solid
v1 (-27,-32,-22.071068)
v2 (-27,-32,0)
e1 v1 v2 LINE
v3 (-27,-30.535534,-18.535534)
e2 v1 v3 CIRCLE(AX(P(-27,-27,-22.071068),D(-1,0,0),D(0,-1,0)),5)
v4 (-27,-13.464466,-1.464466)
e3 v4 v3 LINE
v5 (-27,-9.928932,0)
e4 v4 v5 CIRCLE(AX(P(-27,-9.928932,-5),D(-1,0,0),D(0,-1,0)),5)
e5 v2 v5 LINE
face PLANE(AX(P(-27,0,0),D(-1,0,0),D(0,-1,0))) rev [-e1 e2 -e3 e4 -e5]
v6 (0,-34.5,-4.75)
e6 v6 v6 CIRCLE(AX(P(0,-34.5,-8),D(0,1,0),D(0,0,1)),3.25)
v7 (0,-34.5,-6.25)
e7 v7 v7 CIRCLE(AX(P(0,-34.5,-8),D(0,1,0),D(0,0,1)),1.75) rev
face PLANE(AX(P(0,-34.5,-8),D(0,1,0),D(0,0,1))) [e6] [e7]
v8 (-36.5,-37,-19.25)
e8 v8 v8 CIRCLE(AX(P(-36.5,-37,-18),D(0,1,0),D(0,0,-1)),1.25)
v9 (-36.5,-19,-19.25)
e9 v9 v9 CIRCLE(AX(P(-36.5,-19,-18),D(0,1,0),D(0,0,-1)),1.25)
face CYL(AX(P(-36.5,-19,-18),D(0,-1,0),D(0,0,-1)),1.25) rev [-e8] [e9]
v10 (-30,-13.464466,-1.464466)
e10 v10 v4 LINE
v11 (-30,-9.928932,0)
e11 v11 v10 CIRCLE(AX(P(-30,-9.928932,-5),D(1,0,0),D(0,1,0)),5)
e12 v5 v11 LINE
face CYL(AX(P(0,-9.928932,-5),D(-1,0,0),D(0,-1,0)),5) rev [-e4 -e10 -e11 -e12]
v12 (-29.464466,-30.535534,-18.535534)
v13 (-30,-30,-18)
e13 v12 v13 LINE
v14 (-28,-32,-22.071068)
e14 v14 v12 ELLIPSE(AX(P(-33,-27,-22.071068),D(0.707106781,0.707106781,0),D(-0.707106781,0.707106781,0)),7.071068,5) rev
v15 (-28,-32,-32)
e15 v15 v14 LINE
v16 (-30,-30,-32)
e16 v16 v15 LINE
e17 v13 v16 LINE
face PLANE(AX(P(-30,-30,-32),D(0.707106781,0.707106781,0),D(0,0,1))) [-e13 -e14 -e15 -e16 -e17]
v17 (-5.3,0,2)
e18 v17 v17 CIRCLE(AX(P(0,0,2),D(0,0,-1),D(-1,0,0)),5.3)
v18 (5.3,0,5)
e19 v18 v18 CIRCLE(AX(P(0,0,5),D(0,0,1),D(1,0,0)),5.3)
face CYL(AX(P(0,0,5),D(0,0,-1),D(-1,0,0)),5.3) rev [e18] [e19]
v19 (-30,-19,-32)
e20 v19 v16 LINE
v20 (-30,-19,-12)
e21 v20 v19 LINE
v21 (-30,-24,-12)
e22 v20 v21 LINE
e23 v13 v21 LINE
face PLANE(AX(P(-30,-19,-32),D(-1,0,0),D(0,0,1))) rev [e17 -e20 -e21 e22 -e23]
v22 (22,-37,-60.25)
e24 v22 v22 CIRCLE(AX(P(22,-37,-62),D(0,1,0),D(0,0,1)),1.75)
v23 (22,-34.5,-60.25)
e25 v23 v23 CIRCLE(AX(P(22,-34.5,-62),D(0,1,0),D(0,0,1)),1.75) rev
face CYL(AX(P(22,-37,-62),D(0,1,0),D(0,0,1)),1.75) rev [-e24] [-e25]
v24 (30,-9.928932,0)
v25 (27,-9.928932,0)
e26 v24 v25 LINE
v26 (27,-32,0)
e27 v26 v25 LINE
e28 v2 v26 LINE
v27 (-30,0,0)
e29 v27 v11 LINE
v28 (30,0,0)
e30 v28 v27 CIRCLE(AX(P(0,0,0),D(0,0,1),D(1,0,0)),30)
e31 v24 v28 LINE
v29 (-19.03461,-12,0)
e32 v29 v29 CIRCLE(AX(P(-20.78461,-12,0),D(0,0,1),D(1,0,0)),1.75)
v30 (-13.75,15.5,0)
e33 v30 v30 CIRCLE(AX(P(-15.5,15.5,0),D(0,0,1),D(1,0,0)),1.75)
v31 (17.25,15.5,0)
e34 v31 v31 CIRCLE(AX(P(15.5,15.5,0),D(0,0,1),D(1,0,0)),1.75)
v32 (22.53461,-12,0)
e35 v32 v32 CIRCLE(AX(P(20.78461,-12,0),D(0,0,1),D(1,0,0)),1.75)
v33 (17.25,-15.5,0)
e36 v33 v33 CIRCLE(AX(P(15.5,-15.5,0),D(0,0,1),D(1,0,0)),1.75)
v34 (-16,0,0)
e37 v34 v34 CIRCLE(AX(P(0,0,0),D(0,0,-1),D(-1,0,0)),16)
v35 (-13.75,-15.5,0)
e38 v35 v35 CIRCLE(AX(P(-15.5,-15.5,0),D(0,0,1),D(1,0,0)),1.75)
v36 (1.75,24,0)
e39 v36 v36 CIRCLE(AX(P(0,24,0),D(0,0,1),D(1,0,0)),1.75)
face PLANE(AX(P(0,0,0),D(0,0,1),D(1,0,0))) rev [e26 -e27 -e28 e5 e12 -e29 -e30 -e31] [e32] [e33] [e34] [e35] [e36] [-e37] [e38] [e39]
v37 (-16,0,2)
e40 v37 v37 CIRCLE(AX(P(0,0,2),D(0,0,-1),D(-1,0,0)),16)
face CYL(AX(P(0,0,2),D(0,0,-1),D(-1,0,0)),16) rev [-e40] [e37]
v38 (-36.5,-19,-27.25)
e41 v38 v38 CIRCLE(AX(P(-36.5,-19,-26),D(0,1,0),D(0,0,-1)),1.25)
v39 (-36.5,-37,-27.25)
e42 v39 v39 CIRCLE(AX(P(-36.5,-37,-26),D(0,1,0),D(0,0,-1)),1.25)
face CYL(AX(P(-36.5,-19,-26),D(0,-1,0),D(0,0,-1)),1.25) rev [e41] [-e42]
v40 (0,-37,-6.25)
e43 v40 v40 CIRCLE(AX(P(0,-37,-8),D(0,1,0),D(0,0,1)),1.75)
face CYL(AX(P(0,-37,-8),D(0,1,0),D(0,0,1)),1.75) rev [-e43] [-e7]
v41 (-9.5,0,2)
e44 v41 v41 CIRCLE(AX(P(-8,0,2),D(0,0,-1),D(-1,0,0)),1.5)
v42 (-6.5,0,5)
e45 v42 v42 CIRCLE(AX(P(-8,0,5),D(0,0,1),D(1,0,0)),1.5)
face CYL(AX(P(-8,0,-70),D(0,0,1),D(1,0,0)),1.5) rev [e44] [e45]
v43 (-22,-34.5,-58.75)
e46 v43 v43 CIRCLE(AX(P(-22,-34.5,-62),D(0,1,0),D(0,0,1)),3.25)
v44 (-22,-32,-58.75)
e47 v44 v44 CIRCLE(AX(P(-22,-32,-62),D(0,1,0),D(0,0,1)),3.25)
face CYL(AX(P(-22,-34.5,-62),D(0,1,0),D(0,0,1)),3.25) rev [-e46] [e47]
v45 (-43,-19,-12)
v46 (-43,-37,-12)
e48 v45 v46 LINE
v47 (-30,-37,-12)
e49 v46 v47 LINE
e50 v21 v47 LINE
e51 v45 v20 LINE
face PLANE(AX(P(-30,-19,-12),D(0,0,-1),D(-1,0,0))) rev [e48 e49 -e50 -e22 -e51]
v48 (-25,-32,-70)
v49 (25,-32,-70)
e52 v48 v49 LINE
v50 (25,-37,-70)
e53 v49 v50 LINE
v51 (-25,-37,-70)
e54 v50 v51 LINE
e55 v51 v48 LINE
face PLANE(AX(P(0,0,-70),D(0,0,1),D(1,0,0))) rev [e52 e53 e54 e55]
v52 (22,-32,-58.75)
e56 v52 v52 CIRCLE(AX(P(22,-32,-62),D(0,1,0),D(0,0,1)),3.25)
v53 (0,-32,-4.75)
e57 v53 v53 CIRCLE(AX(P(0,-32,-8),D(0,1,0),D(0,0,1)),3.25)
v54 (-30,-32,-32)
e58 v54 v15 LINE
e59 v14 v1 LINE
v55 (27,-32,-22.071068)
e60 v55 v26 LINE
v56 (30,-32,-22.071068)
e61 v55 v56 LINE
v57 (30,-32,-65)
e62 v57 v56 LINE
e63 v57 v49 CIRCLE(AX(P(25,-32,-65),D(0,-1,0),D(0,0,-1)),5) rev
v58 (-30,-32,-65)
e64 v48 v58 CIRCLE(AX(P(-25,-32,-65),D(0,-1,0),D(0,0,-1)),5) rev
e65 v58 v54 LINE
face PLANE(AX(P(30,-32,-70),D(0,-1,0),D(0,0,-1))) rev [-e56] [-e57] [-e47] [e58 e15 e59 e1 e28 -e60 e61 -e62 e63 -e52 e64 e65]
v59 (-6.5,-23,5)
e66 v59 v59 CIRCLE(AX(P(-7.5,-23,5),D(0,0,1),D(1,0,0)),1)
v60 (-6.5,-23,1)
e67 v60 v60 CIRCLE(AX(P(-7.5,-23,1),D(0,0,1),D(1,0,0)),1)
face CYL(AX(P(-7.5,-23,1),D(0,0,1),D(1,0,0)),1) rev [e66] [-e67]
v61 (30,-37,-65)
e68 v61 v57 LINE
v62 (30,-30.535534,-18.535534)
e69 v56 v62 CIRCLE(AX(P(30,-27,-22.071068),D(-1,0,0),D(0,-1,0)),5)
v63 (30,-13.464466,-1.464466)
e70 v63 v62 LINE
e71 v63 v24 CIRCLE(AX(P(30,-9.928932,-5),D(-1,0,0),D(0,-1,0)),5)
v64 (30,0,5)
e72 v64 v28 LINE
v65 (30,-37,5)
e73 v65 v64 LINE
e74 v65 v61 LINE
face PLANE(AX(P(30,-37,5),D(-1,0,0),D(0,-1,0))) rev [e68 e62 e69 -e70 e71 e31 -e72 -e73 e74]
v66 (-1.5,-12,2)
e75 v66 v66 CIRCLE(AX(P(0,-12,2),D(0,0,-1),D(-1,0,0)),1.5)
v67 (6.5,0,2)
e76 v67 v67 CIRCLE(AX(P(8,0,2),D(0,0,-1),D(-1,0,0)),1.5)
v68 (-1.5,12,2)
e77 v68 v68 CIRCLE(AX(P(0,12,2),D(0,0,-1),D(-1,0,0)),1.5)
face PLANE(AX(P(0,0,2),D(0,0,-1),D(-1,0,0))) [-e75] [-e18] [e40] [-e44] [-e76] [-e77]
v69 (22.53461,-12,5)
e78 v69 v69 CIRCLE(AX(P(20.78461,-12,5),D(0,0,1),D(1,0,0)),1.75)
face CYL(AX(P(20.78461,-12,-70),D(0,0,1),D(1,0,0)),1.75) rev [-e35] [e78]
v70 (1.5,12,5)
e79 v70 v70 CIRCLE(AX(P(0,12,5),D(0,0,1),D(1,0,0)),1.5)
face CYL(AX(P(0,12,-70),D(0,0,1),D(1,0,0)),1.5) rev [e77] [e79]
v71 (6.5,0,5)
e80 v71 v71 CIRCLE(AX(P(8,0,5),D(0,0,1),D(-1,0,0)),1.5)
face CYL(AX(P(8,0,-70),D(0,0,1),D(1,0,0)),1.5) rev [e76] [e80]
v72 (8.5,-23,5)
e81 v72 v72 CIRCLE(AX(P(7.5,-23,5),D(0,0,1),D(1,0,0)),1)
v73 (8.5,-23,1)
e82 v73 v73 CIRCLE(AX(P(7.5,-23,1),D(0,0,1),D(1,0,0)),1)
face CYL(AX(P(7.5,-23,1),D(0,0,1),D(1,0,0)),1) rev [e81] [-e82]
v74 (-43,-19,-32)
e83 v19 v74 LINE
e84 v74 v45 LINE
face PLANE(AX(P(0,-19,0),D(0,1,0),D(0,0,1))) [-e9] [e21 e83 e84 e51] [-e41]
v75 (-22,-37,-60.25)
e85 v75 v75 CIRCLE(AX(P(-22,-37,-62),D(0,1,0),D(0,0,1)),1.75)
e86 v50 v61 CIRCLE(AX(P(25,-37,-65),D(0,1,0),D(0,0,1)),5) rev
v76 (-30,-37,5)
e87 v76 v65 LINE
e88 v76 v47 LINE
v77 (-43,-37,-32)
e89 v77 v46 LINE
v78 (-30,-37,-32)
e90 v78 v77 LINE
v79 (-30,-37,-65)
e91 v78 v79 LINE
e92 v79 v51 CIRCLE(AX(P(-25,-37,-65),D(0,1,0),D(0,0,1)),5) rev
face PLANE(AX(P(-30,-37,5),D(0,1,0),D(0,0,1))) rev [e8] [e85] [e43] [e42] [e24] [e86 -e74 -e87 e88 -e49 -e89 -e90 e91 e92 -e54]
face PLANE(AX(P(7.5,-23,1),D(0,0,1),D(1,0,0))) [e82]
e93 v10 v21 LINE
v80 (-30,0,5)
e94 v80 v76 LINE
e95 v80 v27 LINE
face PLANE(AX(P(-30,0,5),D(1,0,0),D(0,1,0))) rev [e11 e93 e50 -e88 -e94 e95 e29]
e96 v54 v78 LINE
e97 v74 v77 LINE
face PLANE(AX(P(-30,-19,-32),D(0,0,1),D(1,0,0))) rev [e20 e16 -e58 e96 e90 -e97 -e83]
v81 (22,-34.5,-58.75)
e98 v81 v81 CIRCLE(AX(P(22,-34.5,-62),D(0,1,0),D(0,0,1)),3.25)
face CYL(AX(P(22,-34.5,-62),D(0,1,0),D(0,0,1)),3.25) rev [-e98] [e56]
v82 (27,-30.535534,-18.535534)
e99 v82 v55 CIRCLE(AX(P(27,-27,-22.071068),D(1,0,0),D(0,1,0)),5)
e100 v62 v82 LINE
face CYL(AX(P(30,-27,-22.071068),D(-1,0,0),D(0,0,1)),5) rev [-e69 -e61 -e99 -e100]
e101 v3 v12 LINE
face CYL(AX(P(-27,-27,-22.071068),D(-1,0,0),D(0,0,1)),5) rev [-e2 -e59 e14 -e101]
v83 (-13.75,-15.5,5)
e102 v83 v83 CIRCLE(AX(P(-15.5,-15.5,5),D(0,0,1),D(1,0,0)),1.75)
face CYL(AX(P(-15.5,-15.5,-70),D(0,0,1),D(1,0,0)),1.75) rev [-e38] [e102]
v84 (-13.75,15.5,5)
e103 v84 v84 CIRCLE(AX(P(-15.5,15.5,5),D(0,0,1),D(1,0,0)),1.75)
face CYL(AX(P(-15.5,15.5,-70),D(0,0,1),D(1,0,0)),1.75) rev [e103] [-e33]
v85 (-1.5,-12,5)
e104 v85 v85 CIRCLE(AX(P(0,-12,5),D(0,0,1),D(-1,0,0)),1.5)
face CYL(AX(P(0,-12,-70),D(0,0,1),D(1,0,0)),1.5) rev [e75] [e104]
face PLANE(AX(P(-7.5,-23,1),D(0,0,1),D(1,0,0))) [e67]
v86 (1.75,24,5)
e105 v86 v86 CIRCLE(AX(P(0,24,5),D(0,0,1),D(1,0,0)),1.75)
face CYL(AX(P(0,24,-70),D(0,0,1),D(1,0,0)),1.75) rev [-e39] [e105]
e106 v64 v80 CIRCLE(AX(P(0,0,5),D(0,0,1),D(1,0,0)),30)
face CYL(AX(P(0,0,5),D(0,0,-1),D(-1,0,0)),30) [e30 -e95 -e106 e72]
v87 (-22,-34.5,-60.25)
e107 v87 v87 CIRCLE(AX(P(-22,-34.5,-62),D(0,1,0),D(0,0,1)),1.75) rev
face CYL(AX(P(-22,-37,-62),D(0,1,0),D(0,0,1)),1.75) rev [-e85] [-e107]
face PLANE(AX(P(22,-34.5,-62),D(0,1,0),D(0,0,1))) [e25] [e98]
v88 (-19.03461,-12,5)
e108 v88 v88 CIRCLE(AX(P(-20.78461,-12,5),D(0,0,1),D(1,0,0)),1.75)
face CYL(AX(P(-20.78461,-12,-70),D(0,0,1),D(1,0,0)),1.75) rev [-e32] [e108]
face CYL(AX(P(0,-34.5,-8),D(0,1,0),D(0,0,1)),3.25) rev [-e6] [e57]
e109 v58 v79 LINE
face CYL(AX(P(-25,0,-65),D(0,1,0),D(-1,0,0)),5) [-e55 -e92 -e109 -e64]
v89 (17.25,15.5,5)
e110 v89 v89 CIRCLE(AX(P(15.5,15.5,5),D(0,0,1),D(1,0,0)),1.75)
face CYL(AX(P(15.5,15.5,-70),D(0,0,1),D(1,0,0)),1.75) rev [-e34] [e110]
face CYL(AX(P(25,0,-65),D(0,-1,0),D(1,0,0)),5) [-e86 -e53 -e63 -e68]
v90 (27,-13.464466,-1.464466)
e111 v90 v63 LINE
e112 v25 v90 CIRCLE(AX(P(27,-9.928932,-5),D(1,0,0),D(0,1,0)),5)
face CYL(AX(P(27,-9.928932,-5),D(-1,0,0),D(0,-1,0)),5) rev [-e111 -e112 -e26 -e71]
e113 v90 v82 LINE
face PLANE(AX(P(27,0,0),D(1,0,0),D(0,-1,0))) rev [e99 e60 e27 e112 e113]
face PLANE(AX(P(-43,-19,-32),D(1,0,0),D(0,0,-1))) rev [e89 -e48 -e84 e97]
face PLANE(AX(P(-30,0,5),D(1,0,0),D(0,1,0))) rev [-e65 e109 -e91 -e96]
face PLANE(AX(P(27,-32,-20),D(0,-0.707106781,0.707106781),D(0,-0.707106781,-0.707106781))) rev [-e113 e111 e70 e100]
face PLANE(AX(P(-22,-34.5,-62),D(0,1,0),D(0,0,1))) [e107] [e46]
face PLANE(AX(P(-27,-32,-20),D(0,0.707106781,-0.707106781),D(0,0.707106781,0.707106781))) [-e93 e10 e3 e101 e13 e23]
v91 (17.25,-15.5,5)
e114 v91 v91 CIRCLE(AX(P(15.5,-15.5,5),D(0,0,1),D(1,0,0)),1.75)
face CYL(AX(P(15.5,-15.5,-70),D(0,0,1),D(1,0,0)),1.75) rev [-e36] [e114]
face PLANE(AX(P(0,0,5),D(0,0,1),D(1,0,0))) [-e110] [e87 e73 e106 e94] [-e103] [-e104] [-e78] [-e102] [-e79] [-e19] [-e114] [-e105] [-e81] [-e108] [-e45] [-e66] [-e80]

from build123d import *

# Parameters (mm, degrees)
ESBO_O1_R                = 5.3
RESSALTO_EXTRUS_O1_DEPTH = 5
ESBO_O2_W                = 60
ESBO_O2_H                = 5
RESSALTO_EXTRUS_O2_DEPTH = 70
ESBO_O5_R                = 16
CORTE_EXTRUS_O2_DEPTH    = 2
FILETE1_R                = 5
ESBO_O3_R                = 1.75
CORTE_EXTRUS_O1_DEPTH    = 89.848185125
RESSALTO_EXTRUS_O3_DEPTH = 3
FILETE2_R                = 5
ESBO_O6_R                = 1.5
CORTE_EXTRUS_O3_DEPTH    = 89.848185125
ESBO_O8_R                = 1.5
CORTE_EXTRUS_O4_DEPTH    = 89.848185125
ESBO_O9_R                = 1.75
CORTE_EXTRUS_O5_DEPTH    = 89.848185125
ESBO_O10_R               = 1.75
CORTE_EXTRUS_O6_DEPTH    = 99.203869578
ESBO_O11_R               = 3.25
CORTE_EXTRUS_O7_DEPTH    = 2.5
ESBO_O13_W               = 13
ESBO_O13_H               = 20
ESBO_O13_R               = 1.25
RESSALTO_EXTRUS_O4_DEPTH = 18
ESBO_O18_R               = 1
CORTE_EXTRUS_O9_DEPTH    = 4
CHANFRO1_SIZE            = 2


with BuildPart() as part:
    # Esboço1 → Ressalto-extrusão1 (new body)
    with BuildSketch(Plane.XY):
        with BuildLine():
            Line((-30, 0), (-30, -37))
            Line((-30, -37), (30, -37))
            Line((30, -37), (30, 0))
            ThreePointArc((30, 0), (0, 30), (-30, 0))
        make_face()
        Circle(ESBO_O1_R, mode=Mode.SUBTRACT)
    extrude(amount=RESSALTO_EXTRUS_O1_DEPTH)

    # Esboço2 → Ressalto-extrusão2 (add)
    with BuildSketch(Plane(origin=(0, 0, 0), x_dir=(-1, 0, 0), z_dir=(0, 0, -1))):
        with Locations((0, -34.5)):
            Rectangle(ESBO_O2_W, ESBO_O2_H)
    extrude(amount=RESSALTO_EXTRUS_O2_DEPTH)

    # Esboço5 → Corte-extrusão2 (cut)
    with BuildSketch(Plane(origin=(0, 0, 0), x_dir=(-1, 0, 0), z_dir=(0, 0, -1))):
        Circle(ESBO_O5_R)
    extrude(amount=-CORTE_EXTRUS_O2_DEPTH, mode=Mode.SUBTRACT)

    # Filete1
    filete1_edges = [part.edges().sort_by_distance(p)[0] for p in [
        (30, -34.5, -70),
        (-30, -34.5, -70),
    ]]
    fillet(filete1_edges, radius=FILETE1_R)

    # Esboço3 → Corte-extrusão1 (cut, through all)
    with BuildSketch(Plane.XY.offset(5)):
        with Locations((0, 24)):
            Circle(ESBO_O3_R)
        with Locations((20.784609691, -12)):
            Circle(ESBO_O3_R)
        with Locations((-20.784609691, -12)):
            Circle(ESBO_O3_R)
    extrude(amount=-CORTE_EXTRUS_O1_DEPTH, mode=Mode.SUBTRACT)

    # Esboço4 → Ressalto-extrusão3 (add)
    with BuildSketch(Plane.ZY.offset(30)):
        Polygon((-20, -32), (0, -12), (0, -32), align=None)
    ressalto_extrus_o3 = extrude(amount=-RESSALTO_EXTRUS_O3_DEPTH)

    # Espelhar1: Ressalto-extrusão3 across plane
    add(ressalto_extrus_o3.mirror(Plane(origin=(0, 0, 0), x_dir=(0, 0, 1), z_dir=(1, 0, 0))))

    # Filete2
    filete2_edges = [part.edges().sort_by_distance(p)[0] for p in [
        (-28.5, -32, -20),
        (-28.5, -12, 0),
        (28.5, -32, -20),
        (28.5, -12, 0),
    ]]
    fillet(filete2_edges, radius=FILETE2_R)

    # Esboço6 → Corte-extrusão3 (cut, through all)
    with BuildSketch(Plane.XY.offset(5)):
        with Locations((-8, 0)):
            Circle(ESBO_O6_R)
        with Locations(Location((8, 0, 0), (0, 0, 180))):
            Circle(ESBO_O6_R)
    extrude(amount=-CORTE_EXTRUS_O3_DEPTH, mode=Mode.SUBTRACT)

    # Esboço8 → Corte-extrusão4 (cut, through all)
    with BuildSketch(Plane.XY.offset(5)):
        with Locations((0, 12)):
            Circle(ESBO_O8_R)
        with Locations(Location((0, -12, 0), (0, 0, 180))):
            Circle(ESBO_O8_R)
    extrude(amount=-CORTE_EXTRUS_O4_DEPTH, mode=Mode.SUBTRACT)

    # Esboço9 → Corte-extrusão5 (cut, through all)
    with BuildSketch(Plane.XY.offset(5)):
        with Locations((-15.5, 15.5)):
            Circle(ESBO_O9_R)
        with Locations((15.5, 15.5)):
            Circle(ESBO_O9_R)
        with Locations((15.5, -15.5)):
            Circle(ESBO_O9_R)
        with Locations((-15.5, -15.5)):
            Circle(ESBO_O9_R)
    extrude(amount=-CORTE_EXTRUS_O5_DEPTH, mode=Mode.SUBTRACT)

    # Esboço10 → Corte-extrusão6 (cut, through all)
    with BuildSketch(Plane(origin=(0, -32, 0), x_dir=(1, 0, 0), z_dir=(0, 1, 0))):
        with Locations(Location((0, 8, 0), (0, 0, 270))):
            Circle(ESBO_O10_R)
        with Locations(Location((-22, 62, 0), (0, 0, 270))):
            Circle(ESBO_O10_R)
        with Locations(Location((22, 62, 0), (0, 0, 270))):
            Circle(ESBO_O10_R)
    extrude(amount=-CORTE_EXTRUS_O6_DEPTH, mode=Mode.SUBTRACT)

    # Esboço11 → Corte-extrusão7 (cut)
    with BuildSketch(Plane(origin=(0, -32, 0), x_dir=(1, 0, 0), z_dir=(0, 1, 0))):
        with Locations(Location((-22, 62, 0), (0, 0, 270))):
            Circle(ESBO_O11_R)
        with Locations(Location((22, 62, 0), (0, 0, 270))):
            Circle(ESBO_O11_R)
        with Locations(Location((0, 8, 0), (0, 0, 270))):
            Circle(ESBO_O11_R)
    extrude(amount=-CORTE_EXTRUS_O7_DEPTH, mode=Mode.SUBTRACT)

    # Esboço13 → Ressalto-extrusão4 (add)
    with BuildSketch(Plane(origin=(0, -37, 0), x_dir=(1, 0, 0), z_dir=(0, 1, 0))):
        with Locations((-36.5, 22)):
            Rectangle(ESBO_O13_W, ESBO_O13_H)
        with Locations(Location((-36.5, 18, 0), (0, 0, 90))):
            Circle(ESBO_O13_R, mode=Mode.SUBTRACT)
        with Locations(Location((-36.5, 26, 0), (0, 0, 90))):
            Circle(ESBO_O13_R, mode=Mode.SUBTRACT)
    extrude(amount=RESSALTO_EXTRUS_O4_DEPTH)

    # Esboço18 → Corte-extrusão9 (cut)
    with BuildSketch(Plane.XY.offset(5)):
        with Locations((-7.5, -23)):
            Circle(ESBO_O18_R)
        with Locations((7.5, -23)):
            Circle(ESBO_O18_R)
    extrude(amount=-CORTE_EXTRUS_O9_DEPTH, mode=Mode.SUBTRACT)

    # Chanfro1
    # the kernel refuses this chamfer: 2 mm, written as the material it adds along each edge
    with BuildSketch(Plane(origin=(-30, -32, -16.927701836), x_dir=(0.9996219169112968, -0.027495876610585647, 0), z_dir=(0, 0, -1))) as chanfro1_piece_1:
        Polygon((CHANFRO1_SIZE * 0.999621916911, -CHANFRO1_SIZE * 0.0274958766106), (-CHANFRO1_SIZE * 0.0274958766106, -CHANFRO1_SIZE * 0.999621916911), (0, 0), align=None)
    extrude(amount=15.072298164)


solid = part.part
